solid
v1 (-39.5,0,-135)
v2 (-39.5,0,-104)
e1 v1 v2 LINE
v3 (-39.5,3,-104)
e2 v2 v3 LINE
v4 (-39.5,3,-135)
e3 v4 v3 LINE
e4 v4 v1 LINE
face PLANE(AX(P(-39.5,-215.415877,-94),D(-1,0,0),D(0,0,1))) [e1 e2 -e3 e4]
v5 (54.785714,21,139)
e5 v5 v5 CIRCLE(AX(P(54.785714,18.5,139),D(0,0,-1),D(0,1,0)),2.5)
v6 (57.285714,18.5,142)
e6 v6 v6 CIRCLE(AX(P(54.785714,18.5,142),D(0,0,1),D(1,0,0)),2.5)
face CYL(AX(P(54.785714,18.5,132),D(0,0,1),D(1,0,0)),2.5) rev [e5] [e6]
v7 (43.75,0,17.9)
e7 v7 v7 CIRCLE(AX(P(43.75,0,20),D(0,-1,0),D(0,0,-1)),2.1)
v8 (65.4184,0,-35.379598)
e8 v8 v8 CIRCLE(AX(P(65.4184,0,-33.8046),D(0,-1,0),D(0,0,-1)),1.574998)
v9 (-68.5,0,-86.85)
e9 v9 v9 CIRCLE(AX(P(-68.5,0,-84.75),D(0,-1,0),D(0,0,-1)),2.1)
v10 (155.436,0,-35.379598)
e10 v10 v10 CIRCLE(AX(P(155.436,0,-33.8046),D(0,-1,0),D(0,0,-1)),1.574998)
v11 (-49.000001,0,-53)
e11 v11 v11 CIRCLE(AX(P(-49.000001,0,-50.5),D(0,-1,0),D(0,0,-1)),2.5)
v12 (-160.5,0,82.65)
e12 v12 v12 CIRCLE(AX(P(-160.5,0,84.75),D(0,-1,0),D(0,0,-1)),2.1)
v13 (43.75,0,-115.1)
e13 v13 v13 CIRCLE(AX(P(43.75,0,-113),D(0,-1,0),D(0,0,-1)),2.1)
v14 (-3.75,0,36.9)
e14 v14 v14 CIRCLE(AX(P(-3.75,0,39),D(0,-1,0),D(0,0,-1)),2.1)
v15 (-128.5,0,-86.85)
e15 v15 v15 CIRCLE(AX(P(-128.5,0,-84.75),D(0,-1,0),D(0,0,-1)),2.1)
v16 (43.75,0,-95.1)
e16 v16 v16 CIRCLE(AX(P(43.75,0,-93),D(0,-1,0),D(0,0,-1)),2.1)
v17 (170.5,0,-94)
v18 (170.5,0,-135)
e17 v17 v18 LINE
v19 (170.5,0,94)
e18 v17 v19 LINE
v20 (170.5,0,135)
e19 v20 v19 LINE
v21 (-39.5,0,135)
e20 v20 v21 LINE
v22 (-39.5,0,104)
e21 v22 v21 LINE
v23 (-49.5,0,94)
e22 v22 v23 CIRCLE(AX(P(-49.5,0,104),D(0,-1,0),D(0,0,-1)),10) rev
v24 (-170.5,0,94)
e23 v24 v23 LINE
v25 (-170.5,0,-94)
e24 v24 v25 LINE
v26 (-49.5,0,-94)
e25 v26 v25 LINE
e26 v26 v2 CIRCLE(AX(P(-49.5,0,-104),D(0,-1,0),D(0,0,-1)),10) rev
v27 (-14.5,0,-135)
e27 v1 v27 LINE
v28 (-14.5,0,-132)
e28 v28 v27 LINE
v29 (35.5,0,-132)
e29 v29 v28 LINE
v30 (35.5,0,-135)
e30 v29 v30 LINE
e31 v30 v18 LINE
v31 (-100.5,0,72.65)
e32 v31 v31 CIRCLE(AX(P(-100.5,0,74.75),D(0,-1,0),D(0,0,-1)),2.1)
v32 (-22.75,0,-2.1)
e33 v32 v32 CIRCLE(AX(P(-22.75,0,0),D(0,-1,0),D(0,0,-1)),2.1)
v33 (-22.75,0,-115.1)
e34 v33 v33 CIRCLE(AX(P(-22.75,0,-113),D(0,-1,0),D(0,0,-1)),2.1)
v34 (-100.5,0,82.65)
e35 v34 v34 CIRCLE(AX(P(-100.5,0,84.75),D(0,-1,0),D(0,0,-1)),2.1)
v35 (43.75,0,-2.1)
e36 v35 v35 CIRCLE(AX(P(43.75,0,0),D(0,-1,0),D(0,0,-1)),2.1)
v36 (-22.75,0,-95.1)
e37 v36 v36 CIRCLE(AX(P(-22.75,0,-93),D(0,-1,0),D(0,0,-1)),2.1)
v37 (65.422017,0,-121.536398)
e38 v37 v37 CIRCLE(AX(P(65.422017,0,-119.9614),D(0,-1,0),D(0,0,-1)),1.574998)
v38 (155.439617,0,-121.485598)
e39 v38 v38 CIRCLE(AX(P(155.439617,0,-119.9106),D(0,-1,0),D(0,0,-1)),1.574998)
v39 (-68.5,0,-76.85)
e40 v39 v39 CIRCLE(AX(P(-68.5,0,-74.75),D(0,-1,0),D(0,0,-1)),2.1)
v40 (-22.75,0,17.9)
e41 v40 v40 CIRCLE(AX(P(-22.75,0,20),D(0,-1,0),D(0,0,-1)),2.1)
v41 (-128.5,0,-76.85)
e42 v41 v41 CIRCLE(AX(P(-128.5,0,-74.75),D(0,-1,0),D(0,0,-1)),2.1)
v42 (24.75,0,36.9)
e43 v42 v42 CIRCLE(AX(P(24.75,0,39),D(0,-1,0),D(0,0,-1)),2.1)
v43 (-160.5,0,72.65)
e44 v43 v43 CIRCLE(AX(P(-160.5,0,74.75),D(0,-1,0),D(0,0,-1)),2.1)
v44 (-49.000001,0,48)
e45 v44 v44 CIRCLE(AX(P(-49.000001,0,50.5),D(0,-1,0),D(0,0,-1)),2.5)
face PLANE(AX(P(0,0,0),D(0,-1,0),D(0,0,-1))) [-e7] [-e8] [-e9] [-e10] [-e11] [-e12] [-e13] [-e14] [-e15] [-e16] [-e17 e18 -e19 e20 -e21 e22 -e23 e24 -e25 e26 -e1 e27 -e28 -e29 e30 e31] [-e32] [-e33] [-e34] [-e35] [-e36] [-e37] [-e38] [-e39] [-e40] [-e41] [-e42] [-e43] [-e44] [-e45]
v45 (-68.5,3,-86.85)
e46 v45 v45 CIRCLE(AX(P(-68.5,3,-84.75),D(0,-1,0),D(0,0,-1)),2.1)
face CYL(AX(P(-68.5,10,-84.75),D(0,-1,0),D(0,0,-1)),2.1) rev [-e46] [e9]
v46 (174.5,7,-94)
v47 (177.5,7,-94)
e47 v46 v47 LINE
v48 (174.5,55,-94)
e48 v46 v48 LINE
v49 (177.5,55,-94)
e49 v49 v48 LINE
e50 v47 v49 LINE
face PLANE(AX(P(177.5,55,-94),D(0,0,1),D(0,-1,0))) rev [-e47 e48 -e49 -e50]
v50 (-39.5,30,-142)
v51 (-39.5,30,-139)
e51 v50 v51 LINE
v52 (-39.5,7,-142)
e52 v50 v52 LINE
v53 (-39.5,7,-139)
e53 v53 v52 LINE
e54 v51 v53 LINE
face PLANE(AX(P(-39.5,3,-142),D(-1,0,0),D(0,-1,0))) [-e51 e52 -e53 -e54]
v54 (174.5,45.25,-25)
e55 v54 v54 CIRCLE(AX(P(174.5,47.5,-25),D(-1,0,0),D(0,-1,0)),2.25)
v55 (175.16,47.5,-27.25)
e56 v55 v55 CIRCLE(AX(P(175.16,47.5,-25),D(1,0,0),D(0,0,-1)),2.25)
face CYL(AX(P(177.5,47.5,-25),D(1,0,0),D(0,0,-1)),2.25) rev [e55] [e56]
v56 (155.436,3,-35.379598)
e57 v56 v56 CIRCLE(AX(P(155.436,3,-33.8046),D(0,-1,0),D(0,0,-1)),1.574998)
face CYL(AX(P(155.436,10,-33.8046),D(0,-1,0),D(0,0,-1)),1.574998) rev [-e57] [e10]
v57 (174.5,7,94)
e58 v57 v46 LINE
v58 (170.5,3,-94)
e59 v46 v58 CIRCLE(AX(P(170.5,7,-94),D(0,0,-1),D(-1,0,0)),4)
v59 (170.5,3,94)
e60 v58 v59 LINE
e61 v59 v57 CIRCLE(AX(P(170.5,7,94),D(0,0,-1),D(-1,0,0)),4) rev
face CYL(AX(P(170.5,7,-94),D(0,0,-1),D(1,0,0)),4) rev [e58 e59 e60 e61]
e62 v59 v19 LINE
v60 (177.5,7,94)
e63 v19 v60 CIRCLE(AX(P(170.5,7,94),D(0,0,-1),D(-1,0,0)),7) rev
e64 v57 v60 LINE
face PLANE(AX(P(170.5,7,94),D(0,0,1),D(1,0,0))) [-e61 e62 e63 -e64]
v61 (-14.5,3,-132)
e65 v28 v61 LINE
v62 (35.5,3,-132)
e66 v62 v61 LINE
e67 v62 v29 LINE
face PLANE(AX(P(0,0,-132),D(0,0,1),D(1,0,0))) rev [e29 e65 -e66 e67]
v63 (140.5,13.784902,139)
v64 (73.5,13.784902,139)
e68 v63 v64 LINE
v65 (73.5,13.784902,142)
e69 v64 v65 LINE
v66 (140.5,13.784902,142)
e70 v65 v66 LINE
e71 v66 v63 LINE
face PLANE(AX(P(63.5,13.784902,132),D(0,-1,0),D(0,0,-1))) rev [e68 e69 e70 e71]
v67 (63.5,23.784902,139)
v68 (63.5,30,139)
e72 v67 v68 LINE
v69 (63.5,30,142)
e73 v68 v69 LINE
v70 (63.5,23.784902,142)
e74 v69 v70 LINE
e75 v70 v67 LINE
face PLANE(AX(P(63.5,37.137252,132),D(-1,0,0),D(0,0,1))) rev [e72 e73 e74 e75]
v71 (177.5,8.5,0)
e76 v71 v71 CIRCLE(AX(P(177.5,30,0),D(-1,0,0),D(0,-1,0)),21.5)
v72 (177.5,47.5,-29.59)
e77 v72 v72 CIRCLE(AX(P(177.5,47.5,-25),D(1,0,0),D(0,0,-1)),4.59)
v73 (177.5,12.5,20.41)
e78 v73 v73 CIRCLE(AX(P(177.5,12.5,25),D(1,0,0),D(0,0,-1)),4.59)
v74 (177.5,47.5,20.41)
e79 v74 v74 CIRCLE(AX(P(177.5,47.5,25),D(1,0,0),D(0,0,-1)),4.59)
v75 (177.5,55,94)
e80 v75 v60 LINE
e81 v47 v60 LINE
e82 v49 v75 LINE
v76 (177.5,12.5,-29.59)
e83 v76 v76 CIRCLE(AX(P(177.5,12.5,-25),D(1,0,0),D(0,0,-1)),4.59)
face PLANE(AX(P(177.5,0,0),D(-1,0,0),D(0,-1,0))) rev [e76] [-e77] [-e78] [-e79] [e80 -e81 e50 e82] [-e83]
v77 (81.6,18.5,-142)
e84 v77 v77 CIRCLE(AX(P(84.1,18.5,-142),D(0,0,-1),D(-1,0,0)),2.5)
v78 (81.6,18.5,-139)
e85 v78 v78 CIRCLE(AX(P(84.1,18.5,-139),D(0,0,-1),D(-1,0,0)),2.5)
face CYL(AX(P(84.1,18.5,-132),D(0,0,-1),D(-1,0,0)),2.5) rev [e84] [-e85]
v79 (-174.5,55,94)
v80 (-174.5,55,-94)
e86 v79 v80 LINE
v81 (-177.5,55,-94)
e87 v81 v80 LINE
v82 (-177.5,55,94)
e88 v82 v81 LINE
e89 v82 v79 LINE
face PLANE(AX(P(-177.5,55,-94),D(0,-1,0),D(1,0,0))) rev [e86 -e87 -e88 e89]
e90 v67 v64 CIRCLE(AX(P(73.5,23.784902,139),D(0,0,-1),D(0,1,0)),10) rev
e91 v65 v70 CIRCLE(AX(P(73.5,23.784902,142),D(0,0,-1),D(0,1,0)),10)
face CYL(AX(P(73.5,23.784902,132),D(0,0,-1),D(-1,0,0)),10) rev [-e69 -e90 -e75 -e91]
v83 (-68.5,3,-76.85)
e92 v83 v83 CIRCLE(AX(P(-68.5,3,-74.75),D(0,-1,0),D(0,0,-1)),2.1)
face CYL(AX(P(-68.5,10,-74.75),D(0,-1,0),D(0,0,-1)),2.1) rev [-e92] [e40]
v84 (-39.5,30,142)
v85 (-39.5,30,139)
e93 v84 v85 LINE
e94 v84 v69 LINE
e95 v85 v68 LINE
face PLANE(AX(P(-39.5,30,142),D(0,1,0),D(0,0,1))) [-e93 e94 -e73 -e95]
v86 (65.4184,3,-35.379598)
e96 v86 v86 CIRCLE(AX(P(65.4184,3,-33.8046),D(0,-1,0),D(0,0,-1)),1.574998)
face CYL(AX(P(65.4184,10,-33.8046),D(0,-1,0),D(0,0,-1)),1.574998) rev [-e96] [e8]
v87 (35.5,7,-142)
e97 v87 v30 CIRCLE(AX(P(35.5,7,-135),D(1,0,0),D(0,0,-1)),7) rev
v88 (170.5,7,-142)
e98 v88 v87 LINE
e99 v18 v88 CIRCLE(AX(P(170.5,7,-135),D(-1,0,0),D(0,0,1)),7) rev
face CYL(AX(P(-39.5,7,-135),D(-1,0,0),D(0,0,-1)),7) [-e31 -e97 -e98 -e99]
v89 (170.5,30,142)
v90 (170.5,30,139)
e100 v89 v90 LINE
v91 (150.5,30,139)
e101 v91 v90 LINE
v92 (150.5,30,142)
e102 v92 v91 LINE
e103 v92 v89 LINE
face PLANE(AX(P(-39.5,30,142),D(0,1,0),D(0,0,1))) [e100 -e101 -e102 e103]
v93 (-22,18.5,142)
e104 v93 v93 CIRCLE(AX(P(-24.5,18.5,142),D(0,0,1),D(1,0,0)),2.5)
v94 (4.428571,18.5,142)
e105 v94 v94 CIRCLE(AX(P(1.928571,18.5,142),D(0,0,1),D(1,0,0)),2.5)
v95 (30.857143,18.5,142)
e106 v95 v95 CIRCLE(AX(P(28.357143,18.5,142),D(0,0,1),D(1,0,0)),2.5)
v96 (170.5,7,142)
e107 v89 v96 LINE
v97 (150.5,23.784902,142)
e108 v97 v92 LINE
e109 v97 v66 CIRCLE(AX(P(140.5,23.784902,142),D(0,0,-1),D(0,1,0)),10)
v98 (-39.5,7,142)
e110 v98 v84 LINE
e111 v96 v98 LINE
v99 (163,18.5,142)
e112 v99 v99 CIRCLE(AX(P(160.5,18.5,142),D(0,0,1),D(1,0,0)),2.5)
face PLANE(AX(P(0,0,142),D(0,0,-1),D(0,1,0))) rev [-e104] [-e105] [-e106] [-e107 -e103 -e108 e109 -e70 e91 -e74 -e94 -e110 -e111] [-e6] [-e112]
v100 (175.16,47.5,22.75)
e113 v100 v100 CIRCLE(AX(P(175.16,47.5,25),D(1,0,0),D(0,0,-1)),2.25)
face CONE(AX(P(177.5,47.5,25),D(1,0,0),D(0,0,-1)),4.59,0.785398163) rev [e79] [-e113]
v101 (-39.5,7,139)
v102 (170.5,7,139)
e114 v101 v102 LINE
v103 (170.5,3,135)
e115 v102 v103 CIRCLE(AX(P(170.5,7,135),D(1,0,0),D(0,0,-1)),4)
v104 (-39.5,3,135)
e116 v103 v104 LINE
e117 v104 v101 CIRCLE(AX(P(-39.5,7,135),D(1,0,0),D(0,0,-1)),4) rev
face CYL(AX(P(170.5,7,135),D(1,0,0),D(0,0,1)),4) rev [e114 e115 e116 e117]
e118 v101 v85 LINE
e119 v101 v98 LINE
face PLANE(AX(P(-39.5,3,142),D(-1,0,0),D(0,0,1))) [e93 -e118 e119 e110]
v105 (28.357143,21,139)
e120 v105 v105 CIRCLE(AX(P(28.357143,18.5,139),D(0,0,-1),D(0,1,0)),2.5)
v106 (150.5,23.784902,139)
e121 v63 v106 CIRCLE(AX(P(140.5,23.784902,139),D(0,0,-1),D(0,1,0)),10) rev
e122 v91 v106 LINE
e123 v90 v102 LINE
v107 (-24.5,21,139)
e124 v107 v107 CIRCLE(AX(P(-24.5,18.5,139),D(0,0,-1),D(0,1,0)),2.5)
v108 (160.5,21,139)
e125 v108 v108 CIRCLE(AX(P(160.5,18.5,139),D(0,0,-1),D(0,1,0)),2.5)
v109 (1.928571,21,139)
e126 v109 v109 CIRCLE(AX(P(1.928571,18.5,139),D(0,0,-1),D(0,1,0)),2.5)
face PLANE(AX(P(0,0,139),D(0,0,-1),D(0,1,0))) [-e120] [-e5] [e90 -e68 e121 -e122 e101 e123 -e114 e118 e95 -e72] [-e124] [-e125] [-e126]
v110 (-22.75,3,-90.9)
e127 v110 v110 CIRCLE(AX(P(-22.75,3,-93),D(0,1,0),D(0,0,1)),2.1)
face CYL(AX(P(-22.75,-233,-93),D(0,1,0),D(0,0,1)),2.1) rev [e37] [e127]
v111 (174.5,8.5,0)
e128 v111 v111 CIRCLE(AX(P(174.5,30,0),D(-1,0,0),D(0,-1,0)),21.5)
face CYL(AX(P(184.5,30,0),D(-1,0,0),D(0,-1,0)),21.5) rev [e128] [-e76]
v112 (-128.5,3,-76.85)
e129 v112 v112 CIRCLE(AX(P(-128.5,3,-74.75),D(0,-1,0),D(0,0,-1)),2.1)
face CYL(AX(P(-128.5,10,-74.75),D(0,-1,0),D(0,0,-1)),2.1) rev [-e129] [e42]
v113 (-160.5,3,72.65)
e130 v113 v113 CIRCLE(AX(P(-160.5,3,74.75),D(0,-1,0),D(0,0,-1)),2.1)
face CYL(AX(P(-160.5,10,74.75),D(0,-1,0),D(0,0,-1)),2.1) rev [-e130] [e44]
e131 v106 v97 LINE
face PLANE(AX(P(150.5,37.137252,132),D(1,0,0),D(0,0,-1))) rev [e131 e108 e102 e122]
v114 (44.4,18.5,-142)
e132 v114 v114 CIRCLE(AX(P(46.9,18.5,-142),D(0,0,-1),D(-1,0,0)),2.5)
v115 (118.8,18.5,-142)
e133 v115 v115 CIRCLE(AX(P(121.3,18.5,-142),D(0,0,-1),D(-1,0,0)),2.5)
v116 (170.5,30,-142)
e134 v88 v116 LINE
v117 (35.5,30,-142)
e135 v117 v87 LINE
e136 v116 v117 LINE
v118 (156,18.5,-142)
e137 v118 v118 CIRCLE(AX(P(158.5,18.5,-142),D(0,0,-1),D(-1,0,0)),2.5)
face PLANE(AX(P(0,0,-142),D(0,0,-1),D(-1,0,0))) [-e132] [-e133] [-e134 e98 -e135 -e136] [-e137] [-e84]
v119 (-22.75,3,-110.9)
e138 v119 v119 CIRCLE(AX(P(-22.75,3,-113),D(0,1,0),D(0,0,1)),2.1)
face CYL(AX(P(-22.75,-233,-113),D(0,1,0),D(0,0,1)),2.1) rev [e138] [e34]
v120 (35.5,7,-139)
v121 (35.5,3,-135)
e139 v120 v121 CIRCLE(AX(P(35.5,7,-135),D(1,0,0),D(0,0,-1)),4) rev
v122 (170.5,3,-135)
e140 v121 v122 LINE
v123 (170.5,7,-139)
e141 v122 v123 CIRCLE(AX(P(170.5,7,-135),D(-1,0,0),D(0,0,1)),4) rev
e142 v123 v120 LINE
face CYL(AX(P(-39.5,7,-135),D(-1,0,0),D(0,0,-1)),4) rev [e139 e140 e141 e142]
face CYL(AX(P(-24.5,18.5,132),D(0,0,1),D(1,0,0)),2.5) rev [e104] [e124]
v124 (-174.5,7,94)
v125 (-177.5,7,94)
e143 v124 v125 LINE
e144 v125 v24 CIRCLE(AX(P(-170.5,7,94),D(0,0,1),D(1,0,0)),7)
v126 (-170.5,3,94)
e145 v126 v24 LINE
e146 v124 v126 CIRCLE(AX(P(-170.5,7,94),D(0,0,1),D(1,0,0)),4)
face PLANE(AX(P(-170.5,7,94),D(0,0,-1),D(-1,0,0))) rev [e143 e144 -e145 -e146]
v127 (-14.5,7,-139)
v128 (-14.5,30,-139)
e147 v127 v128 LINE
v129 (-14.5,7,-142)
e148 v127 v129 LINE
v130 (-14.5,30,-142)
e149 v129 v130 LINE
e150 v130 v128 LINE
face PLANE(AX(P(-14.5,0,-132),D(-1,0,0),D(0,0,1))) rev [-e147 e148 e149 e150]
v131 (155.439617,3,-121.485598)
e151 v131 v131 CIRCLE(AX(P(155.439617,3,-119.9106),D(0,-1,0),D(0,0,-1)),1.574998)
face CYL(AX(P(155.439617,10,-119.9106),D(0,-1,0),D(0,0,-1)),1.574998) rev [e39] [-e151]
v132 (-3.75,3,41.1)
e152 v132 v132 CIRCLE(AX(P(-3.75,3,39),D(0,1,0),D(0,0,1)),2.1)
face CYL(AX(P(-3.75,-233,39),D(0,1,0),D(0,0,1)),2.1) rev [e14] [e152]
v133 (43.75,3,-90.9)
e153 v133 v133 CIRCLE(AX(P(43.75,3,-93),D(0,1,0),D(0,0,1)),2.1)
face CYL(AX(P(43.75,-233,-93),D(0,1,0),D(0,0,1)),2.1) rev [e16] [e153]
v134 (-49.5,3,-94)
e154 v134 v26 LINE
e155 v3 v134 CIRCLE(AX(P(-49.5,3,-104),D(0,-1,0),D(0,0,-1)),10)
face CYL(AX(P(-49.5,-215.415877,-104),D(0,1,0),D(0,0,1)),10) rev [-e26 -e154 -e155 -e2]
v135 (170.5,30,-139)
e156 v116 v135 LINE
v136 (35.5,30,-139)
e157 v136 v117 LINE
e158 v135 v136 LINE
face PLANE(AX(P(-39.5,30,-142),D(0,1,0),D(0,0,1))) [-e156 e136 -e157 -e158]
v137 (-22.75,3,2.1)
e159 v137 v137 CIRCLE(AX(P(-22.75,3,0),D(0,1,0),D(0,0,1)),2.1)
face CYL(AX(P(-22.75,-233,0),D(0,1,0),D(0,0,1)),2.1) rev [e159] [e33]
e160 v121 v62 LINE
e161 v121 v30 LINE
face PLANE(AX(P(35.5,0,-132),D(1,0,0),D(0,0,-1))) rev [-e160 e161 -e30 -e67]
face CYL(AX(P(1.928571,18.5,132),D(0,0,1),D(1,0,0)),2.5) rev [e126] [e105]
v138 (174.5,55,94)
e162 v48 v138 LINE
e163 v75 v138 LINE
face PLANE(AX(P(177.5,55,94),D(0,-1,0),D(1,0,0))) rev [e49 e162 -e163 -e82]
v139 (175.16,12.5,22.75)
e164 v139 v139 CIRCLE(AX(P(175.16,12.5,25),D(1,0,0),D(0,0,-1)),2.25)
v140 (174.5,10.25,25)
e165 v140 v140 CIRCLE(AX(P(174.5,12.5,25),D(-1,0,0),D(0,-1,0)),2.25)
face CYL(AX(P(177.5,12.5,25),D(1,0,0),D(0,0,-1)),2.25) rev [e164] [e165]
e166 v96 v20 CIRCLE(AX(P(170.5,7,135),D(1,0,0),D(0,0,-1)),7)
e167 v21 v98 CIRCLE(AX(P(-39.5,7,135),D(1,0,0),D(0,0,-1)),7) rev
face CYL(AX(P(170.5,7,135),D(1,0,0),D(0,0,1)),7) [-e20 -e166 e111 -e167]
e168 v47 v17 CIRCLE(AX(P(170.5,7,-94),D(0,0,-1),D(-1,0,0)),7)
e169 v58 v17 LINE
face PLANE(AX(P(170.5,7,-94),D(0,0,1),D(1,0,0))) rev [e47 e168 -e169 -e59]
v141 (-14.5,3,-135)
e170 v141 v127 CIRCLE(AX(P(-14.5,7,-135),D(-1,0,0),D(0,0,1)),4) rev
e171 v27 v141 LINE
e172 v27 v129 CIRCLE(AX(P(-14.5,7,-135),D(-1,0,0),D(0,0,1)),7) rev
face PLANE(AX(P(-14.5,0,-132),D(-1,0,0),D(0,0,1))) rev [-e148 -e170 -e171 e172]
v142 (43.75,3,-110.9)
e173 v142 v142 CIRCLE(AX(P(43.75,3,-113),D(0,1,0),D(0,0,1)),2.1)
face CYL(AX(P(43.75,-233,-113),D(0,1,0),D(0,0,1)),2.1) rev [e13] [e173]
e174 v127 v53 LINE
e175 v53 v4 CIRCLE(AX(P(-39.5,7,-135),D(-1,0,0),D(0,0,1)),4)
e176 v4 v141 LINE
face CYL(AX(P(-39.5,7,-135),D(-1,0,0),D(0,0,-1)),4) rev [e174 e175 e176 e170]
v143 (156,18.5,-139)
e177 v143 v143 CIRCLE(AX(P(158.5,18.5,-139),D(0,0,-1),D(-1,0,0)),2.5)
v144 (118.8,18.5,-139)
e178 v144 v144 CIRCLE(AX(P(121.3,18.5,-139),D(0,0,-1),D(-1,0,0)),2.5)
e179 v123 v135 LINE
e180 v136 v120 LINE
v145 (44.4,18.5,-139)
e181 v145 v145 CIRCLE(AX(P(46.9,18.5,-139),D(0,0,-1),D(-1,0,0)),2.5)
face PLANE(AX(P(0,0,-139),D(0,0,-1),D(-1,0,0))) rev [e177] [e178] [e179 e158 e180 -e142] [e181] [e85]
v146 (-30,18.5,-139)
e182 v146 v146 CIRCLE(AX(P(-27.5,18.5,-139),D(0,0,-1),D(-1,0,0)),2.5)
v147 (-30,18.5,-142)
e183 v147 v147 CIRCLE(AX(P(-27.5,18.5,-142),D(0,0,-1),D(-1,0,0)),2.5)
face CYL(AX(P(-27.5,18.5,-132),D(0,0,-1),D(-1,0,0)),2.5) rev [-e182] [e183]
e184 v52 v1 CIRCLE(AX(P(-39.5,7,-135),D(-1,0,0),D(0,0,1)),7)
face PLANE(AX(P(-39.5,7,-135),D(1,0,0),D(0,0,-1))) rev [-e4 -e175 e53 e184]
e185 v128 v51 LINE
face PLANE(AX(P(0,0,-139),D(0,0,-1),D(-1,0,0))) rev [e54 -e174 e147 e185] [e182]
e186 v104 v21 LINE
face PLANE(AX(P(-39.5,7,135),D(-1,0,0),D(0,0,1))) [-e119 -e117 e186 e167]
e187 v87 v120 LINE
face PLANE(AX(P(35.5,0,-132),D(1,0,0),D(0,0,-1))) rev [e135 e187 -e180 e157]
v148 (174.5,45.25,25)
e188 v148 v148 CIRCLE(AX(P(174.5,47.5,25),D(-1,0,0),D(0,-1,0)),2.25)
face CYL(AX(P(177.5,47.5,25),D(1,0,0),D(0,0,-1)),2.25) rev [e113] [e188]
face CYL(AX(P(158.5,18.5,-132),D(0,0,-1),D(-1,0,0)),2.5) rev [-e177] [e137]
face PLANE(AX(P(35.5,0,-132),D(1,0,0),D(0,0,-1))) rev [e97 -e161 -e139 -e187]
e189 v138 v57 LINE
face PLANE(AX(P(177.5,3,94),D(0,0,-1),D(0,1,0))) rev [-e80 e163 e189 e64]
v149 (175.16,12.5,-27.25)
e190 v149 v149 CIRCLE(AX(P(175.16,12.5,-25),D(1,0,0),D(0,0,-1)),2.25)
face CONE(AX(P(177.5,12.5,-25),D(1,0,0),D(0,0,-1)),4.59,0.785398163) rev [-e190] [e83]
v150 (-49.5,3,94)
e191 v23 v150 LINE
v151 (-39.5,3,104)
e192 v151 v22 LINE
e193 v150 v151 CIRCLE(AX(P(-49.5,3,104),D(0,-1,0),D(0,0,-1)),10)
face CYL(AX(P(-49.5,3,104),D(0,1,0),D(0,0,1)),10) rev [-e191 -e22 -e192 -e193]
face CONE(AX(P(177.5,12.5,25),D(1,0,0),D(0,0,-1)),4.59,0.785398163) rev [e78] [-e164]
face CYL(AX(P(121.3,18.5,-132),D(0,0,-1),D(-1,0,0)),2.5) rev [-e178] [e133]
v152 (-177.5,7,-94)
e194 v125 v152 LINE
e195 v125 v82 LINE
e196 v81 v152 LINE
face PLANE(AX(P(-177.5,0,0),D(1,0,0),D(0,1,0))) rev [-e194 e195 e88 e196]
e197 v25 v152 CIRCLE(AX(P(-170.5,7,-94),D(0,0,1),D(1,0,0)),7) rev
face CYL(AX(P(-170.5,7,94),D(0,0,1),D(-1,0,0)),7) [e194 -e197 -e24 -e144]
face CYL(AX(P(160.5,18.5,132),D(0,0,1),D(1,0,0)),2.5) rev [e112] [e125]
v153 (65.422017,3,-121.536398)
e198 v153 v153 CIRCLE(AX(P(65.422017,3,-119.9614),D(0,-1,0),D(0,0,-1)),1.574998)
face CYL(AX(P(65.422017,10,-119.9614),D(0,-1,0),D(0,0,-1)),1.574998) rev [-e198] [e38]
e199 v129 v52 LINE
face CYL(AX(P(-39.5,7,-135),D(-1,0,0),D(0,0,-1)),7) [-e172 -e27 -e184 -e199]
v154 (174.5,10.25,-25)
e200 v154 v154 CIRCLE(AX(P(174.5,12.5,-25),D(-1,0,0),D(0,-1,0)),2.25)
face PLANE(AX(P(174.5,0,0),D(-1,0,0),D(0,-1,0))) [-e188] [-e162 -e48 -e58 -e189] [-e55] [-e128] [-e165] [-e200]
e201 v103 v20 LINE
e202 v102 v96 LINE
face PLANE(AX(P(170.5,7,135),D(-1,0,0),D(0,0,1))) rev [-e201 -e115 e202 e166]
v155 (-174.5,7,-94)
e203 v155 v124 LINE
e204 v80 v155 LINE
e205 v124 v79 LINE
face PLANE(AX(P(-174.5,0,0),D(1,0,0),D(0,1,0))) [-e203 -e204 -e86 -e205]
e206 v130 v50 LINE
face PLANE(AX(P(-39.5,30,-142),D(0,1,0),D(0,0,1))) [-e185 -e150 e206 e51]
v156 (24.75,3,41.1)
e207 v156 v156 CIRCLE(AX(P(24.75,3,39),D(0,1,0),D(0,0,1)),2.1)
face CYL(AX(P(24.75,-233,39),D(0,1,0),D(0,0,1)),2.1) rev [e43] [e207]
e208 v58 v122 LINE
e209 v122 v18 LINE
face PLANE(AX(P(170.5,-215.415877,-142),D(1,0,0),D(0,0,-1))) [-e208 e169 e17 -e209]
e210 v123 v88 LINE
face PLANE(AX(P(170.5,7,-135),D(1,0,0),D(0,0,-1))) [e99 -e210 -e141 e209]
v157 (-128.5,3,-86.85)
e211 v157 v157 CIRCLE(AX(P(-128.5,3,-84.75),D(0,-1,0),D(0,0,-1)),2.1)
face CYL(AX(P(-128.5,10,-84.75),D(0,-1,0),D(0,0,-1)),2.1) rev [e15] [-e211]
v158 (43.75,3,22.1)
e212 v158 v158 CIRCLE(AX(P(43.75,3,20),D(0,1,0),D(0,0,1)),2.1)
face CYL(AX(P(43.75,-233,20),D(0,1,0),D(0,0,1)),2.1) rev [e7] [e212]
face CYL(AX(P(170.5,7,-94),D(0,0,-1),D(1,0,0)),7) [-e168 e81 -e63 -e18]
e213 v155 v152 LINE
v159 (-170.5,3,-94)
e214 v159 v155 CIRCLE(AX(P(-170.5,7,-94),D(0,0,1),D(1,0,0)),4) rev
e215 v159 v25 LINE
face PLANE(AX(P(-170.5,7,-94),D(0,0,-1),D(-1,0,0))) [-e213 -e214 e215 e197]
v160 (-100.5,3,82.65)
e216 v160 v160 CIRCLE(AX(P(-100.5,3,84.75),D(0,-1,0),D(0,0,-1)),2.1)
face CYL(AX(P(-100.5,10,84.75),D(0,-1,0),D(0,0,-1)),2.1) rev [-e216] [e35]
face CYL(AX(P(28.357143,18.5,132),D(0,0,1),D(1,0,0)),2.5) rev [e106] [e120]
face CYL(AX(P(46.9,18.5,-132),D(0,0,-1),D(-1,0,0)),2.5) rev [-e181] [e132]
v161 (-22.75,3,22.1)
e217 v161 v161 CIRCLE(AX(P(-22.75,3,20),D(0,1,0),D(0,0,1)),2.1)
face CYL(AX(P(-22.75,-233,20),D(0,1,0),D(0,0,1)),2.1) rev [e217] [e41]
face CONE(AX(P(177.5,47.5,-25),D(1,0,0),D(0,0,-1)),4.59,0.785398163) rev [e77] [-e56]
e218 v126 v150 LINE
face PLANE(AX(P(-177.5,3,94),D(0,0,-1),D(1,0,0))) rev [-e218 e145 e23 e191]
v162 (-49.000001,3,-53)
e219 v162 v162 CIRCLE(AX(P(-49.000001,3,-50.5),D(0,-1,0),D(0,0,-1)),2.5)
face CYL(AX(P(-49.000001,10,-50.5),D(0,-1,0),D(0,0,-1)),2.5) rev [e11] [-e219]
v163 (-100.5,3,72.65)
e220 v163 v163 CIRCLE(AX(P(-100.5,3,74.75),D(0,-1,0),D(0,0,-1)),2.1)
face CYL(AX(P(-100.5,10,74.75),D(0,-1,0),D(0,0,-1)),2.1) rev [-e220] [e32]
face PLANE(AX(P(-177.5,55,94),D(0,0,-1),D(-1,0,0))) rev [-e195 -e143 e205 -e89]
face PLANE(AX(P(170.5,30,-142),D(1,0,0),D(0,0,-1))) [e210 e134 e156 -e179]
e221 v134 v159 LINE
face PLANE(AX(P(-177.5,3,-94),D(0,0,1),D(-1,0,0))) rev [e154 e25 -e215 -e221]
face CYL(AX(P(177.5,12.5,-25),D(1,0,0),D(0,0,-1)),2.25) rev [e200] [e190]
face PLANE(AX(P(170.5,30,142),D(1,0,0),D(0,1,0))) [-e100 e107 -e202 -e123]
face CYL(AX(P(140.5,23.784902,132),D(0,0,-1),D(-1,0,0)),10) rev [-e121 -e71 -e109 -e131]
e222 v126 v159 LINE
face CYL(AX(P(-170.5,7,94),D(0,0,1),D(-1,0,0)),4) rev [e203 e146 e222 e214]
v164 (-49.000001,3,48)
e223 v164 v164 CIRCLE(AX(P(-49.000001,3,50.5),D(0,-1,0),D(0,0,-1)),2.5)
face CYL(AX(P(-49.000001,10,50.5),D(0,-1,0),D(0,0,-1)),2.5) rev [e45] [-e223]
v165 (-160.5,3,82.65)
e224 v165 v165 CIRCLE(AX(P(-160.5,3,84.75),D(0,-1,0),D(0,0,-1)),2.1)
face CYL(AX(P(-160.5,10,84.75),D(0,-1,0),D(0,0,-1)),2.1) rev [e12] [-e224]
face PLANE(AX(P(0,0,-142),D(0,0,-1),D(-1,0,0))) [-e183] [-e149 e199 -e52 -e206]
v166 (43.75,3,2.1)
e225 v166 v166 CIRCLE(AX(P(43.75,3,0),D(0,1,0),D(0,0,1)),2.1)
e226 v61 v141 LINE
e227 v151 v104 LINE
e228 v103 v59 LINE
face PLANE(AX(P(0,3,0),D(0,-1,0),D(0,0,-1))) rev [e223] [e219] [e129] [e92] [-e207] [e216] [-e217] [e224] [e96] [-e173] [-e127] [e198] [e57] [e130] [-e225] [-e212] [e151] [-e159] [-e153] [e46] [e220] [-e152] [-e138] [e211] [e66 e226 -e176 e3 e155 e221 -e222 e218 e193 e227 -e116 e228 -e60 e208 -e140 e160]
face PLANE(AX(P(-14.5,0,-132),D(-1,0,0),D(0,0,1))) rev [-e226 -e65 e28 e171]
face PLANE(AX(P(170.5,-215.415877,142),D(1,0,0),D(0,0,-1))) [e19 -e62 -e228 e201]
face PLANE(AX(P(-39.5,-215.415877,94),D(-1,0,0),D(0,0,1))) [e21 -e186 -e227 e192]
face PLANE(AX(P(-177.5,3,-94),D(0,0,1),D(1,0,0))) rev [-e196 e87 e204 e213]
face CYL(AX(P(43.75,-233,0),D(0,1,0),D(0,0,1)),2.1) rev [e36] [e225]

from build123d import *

# Parameters (mm, degrees)
SKETCH1_W                                            = 355
SKETCH1_H                                            = 188
BOSS_EXTRUDE1_DEPTH                                  = 3
EDGE_FLANGE1_STRIP_W                                 = 20
EDGE_FLANGE1_STRIP_H                                 = 3
EDGE_FLANGE1_STRIP_CUT_DEPTH                         = 188
EDGE_FLANGE1_DEPTH                                   = 188
SKETCH11_R                                           = 21.5
CUT_EXTRUDE2_DEPTH                                   = 10
CSK_FOR_M4_HEX_SOCKET_COUNTERSUNK_HEAD_S_D           = 4.5
CSK_FOR_M4_HEX_SOCKET_COUNTERSUNK_HEAD_S_DEPTH       = 10
CSK_FOR_M4_HEX_SOCKET_COUNTERSUNK_HEAD_S_CSINK_D     = 9.18
CSK_FOR_M4_HEX_SOCKET_COUNTERSUNK_HEAD_S_CSINK_ANGLE = 90
CSK_FOR_M4_HEX_SOCKET_COUNTERSUNK_HEAD_S_TIP         = 1.351936393
EDGE_FLANGE2_STRIP_W                                 = 20
EDGE_FLANGE2_STRIP_H                                 = 3
EDGE_FLANGE2_STRIP_CUT_DEPTH                         = 188
EDGE_FLANGE2_DEPTH                                   = 188
SKETCH19_W                                           = 210
SKETCH19_H                                           = 48
BOSS_EXTRUDE2_DEPTH                                  = 3
FILLET1_R                                            = 10
EDGE_FLANGE3_STRIP_W                                 = 20
EDGE_FLANGE3_STRIP_H                                 = 3
EDGE_FLANGE3_STRIP_CUT_DEPTH                         = 210
EDGE_FLANGE3_STRIP_2_W                               = 20
EDGE_FLANGE3_STRIP_2_H                               = 3
EDGE_FLANGE3_STRIP_CUT_2_DEPTH                       = 210
EDGE_FLANGE3_DEPTH                                   = 210
EDGE_FLANGE3_BEND_DEPTH                              = 210
SKETCH26_R                                           = 2.1
CUT_EXTRUDE3_DEPTH                                   = 10
SKETCH28_W                                           = 50
SKETCH28_H                                           = 30
CUT_EXTRUDE4_DEPTH                                   = 10
SKETCH29_W                                           = 87
SKETCH29_H                                           = 23.35234987
CUT_EXTRUDE5_DEPTH                                   = 10
FILLET2_R                                            = 10
SKETCH30_R                                           = 2.5
SKETCH30_R_2                                         = 1.57499812
CUT_EXTRUDE6_DEPTH                                   = 10
SKETCH31_R                                           = 2.1
CUT_EXTRUDE7_DEPTH                                   = 236
SKETCH32_R                                           = 2.5
CUT_EXTRUDE8_DEPTH                                   = 10
SKETCH33_R                                           = 2.5
CUT_EXTRUDE9_DEPTH                                   = 10


# Sheet-metal steps are written as plain solids
with BuildPart() as part:
    # Sketch1 → Boss-Extrude1 (new body)
    with BuildSketch(Plane(origin=(0, 0, 0), x_dir=(1, 0, 0), z_dir=(0, 1, 0))):
        Rectangle(SKETCH1_W, SKETCH1_H)
    extrude(amount=BOSS_EXTRUDE1_DEPTH)

    # Edge-Flange1 strip (across the edge) → Edge-Flange1 strip cut (cut)
    with BuildSketch(Plane(origin=(177.5, 3, 94), x_dir=(-1, 0, 0), z_dir=(0, 0, -1))):
        with Locations((-3, -1.5)):
            Rectangle(EDGE_FLANGE1_STRIP_W, EDGE_FLANGE1_STRIP_H)
    extrude(amount=EDGE_FLANGE1_STRIP_CUT_DEPTH, mode=Mode.SUBTRACT)

    # Edge-Flange1 section (across the edge) → Edge-Flange1 (add)
    with BuildSketch(Plane(origin=(177.5, 3, 94), x_dir=(-1, 0, 0), z_dir=(0, 0, -1))):
        with BuildLine():
            Line((0, 4), (0, 52))
            Line((0, 52), (3, 52))
            Line((3, 52), (3, 4))
            ThreePointArc((3, 4), (4.171572875, 1.171572875), (7, 0))
            Line((7, 0), (7, -3))
            ThreePointArc((7, -3), (2.050252532, -0.949747468), (0, 4))
        make_face()
    extrude(amount=EDGE_FLANGE1_DEPTH)

    # Sketch11 → Cut-Extrude2 (cut)
    with BuildSketch(Plane.ZY.offset(-174.5)):
        with Locations(Location((0, 30, 0), (0, 0, 270))):
            Circle(SKETCH11_R)
    extrude(amount=-CUT_EXTRUDE2_DEPTH, mode=Mode.SUBTRACT)

    # CSK for M4 Hex Socket Countersunk Head Screw1
    with Locations(Plane(origin=(177.5, 0, 0), x_dir=(0, 0, -1), z_dir=(1, 0, 0))):
        with Locations((-25, 47.5), (25, 47.5), (25, 12.5), (-25, 12.5)):
            CounterSinkHole(CSK_FOR_M4_HEX_SOCKET_COUNTERSUNK_HEAD_S_D / 2, CSK_FOR_M4_HEX_SOCKET_COUNTERSUNK_HEAD_S_CSINK_D / 2, depth=CSK_FOR_M4_HEX_SOCKET_COUNTERSUNK_HEAD_S_DEPTH, counter_sink_angle=CSK_FOR_M4_HEX_SOCKET_COUNTERSUNK_HEAD_S_CSINK_ANGLE)
            with Locations((0, 0, -(CSK_FOR_M4_HEX_SOCKET_COUNTERSUNK_HEAD_S_DEPTH + CSK_FOR_M4_HEX_SOCKET_COUNTERSUNK_HEAD_S_TIP / 2))):  # 118° drill point
                Cone(0, CSK_FOR_M4_HEX_SOCKET_COUNTERSUNK_HEAD_S_D / 2, CSK_FOR_M4_HEX_SOCKET_COUNTERSUNK_HEAD_S_TIP, mode=Mode.SUBTRACT)

    # Edge-Flange2 strip (across the edge) → Edge-Flange2 strip cut (cut)
    with BuildSketch(Plane(origin=(-177.5, 3, -94), x_dir=(1, 0, 0), z_dir=(0, 0, 1))):
        with Locations((-3, -1.5)):
            Rectangle(EDGE_FLANGE2_STRIP_W, EDGE_FLANGE2_STRIP_H)
    extrude(amount=EDGE_FLANGE2_STRIP_CUT_DEPTH, mode=Mode.SUBTRACT)

    # Edge-Flange2 section (across the edge) → Edge-Flange2 (add)
    with BuildSketch(Plane(origin=(-177.5, 3, -94), x_dir=(1, 0, 0), z_dir=(0, 0, 1))):
        with BuildLine():
            Line((0, 4), (0, 52))
            Line((0, 52), (3, 52))
            Line((3, 52), (3, 4))
            ThreePointArc((3, 4), (4.171572875, 1.171572875), (7, 0))
            Line((7, 0), (7, -3))
            ThreePointArc((7, -3), (2.050252532, -0.949747468), (0, 4))
        make_face()
    extrude(amount=EDGE_FLANGE2_DEPTH)

    # Sketch19 → Boss-Extrude2 (add)
    with BuildSketch(Plane(origin=(0, 3, 0), x_dir=(1, 0, 0), z_dir=(0, 1, 0))):
        with Locations((65.5, 118)):
            Rectangle(SKETCH19_W, SKETCH19_H)
        with Locations((65.5, -118)):
            Rectangle(SKETCH19_W, SKETCH19_H)
    extrude(amount=-BOSS_EXTRUDE2_DEPTH)

    # Fillet1
    fillet1_edges = [part.edges().sort_by_distance(p)[0] for p in [
        (-39.5, 1.5, -94),
        (-39.5, 1.5, 94),
    ]]
    fillet(fillet1_edges, radius=FILLET1_R)

    # Edge-Flange3 strip (across the edge) → Edge-Flange3 strip cut (cut)
    with BuildSketch(Plane(origin=(170.5, 3, -142), x_dir=(0, 0, 1), z_dir=(-1, 0, 0))):
        with Locations((-3, -1.5)):
            Rectangle(EDGE_FLANGE3_STRIP_W, EDGE_FLANGE3_STRIP_H)
    extrude(amount=EDGE_FLANGE3_STRIP_CUT_DEPTH, mode=Mode.SUBTRACT)

    # Edge-Flange3 strip 2 (across the edge) → Edge-Flange3 strip cut 2 (cut)
    with BuildSketch(Plane(origin=(-39.5, 3, 142), x_dir=(0, 0, -1), z_dir=(1, 0, 0))):
        with Locations((-3, -1.5)):
            Rectangle(EDGE_FLANGE3_STRIP_2_W, EDGE_FLANGE3_STRIP_2_H)
    extrude(amount=EDGE_FLANGE3_STRIP_CUT_2_DEPTH, mode=Mode.SUBTRACT)

    # Edge-Flange3 section (across the edge) → Edge-Flange3 (add)
    with BuildSketch(Plane(origin=(170.5, 3, -142), x_dir=(0, 0, 1), z_dir=(-1, 0, 0))):
        with BuildLine():
            Line((0, 4), (0, 27))
            Line((0, 27), (3, 27))
            Line((3, 27), (3, 4))
            ThreePointArc((3, 4), (4.171572875, 1.171572875), (7, 0))
            Line((7, 0), (7, -3))
            ThreePointArc((7, -3), (2.050252532, -0.949747468), (0, 4))
        make_face()
    extrude(amount=EDGE_FLANGE3_DEPTH)

    # Edge-Flange3 section 2 (across the edge) → Edge-Flange3 bend (add)
    with BuildSketch(Plane(origin=(-39.5, 3, 142), x_dir=(0, 0, -1), z_dir=(1, 0, 0))):
        with BuildLine():
            Line((0, 4), (0, 27))
            Line((0, 27), (3, 27))
            Line((3, 27), (3, 4))
            ThreePointArc((3, 4), (4.171572875, 1.171572875), (7, 0))
            Line((7, 0), (7, -3))
            ThreePointArc((7, -3), (2.050252532, -0.949747468), (0, 4))
        make_face()
    extrude(amount=EDGE_FLANGE3_BEND_DEPTH)

    # Sketch26 → Cut-Extrude3 (cut)
    with BuildSketch(Plane(origin=(0, 0, 0), x_dir=(-1, 0, 0), z_dir=(0, -1, 0))):
        with Locations(Location((160.5, -74.75, 0), (0, 0, 90))):
            Circle(SKETCH26_R)
        with Locations(Location((160.5, -84.75, 0), (0, 0, 90))):
            Circle(SKETCH26_R)
        with Locations(Location((100.5, -84.75, 0), (0, 0, 90))):
            Circle(SKETCH26_R)
        with Locations(Location((100.5, -74.75, 0), (0, 0, 90))):
            Circle(SKETCH26_R)
        with Locations(Location((128.5, 74.75, 0), (0, 0, 90))):
            Circle(SKETCH26_R)
        with Locations(Location((128.5, 84.75, 0), (0, 0, 90))):
            Circle(SKETCH26_R)
        with Locations(Location((68.5, 74.75, 0), (0, 0, 90))):
            Circle(SKETCH26_R)
        with Locations(Location((68.5, 84.75, 0), (0, 0, 90))):
            Circle(SKETCH26_R)
    extrude(amount=-CUT_EXTRUDE3_DEPTH, mode=Mode.SUBTRACT)

    # Sketch28 → Cut-Extrude4 (cut)
    with BuildSketch(Plane(origin=(0, 0, -142), x_dir=(-1, 0, 0), z_dir=(0, 0, -1))):
        with Locations((-10.5, 15)):
            Rectangle(SKETCH28_W, SKETCH28_H)
    extrude(amount=-CUT_EXTRUDE4_DEPTH, mode=Mode.SUBTRACT)

    # Sketch29 → Cut-Extrude5 (cut)
    with BuildSketch(Plane.XY.offset(142)):
        with Locations((107, 25.461076577)):
            Rectangle(SKETCH29_W, SKETCH29_H)
    extrude(amount=-CUT_EXTRUDE5_DEPTH, mode=Mode.SUBTRACT)

    # Fillet2
    fillet2_edges = [part.edges().sort_by_distance(p)[0] for p in [
        (63.5, 13.784901642, 140.5),
        (150.5, 13.784901642, 140.5),
    ]]
    fillet(fillet2_edges, radius=FILLET2_R)

    # Sketch30 → Cut-Extrude6 (cut)
    with BuildSketch(Plane(origin=(0, 0, 0), x_dir=(-1, 0, 0), z_dir=(0, -1, 0))):
        with Locations(Location((49.000000561, -50.5, 0), (0, 0, 90))):
            Circle(SKETCH30_R)
        with Locations(Location((49.000000561, 50.5, 0), (0, 0, 90))):
            Circle(SKETCH30_R)
        with Locations(Location((-65.4184, 33.8046, 0), (0, 0, 90))):
            Circle(SKETCH30_R_2)
        with Locations(Location((-155.436, 33.8046, 0), (0, 0, 90))):
            Circle(SKETCH30_R_2)
        with Locations(Location((-155.43961696, 119.9106, 0), (0, 0, 90))):
            Circle(SKETCH30_R_2)
        with Locations(Location((-65.42201696, 119.9614, 0), (0, 0, 90))):
            Circle(SKETCH30_R_2)
    extrude(amount=-CUT_EXTRUDE6_DEPTH, mode=Mode.SUBTRACT)

    # Sketch31 → Cut-Extrude7 (cut)
    with BuildSketch(Plane(origin=(0, 3, 0), x_dir=(1, 0, 0), z_dir=(0, 1, 0))):
        with Locations(Location((-22.75, 113, 0), (0, 0, 270))):
            Circle(SKETCH31_R)
        with Locations(Location((-22.75, 93, 0), (0, 0, 270))):
            Circle(SKETCH31_R)
        with Locations(Location((43.75, 113, 0), (0, 0, 270))):
            Circle(SKETCH31_R)
        with Locations(Location((43.75, 93, 0), (0, 0, 270))):
            Circle(SKETCH31_R)
        with Locations(Location((43.75, 0, 0), (0, 0, 270))):
            Circle(SKETCH31_R)
        with Locations(Location((43.75, -20, 0), (0, 0, 270))):
            Circle(SKETCH31_R)
        with Locations(Location((-3.75, -39, 0), (0, 0, 270))):
            Circle(SKETCH31_R)
        with Locations(Location((24.75, -39, 0), (0, 0, 270))):
            Circle(SKETCH31_R)
        with Locations(Location((-22.75, 0, 0), (0, 0, 270))):
            Circle(SKETCH31_R)
        with Locations(Location((-22.75, -20, 0), (0, 0, 270))):
            Circle(SKETCH31_R)
    extrude(amount=-CUT_EXTRUDE7_DEPTH, mode=Mode.SUBTRACT)

    # Sketch32 → Cut-Extrude8 (cut)
    with BuildSketch(Plane.XY.offset(142)):
        with Locations((-24.5, 18.5)):
            Circle(SKETCH32_R)
        with Locations((1.928571429, 18.5)):
            Circle(SKETCH32_R)
        with Locations((28.357142857, 18.5)):
            Circle(SKETCH32_R)
        with Locations((54.785714286, 18.5)):
            Circle(SKETCH32_R)
        with Locations((160.5, 18.5)):
            Circle(SKETCH32_R)
    extrude(amount=-CUT_EXTRUDE8_DEPTH, mode=Mode.SUBTRACT)

    # Sketch33 → Cut-Extrude9 (cut)
    with BuildSketch(Plane(origin=(0, 0, -142), x_dir=(-1, 0, 0), z_dir=(0, 0, -1))):
        with Locations((-158.5, 18.5)):
            Circle(SKETCH33_R)
        with Locations((-121.3, 18.5)):
            Circle(SKETCH33_R)
        with Locations((-84.1, 18.5)):
            Circle(SKETCH33_R)
        with Locations((-46.9, 18.5)):
            Circle(SKETCH33_R)
        with Locations((27.5, 18.5)):
            Circle(SKETCH33_R)
    extrude(amount=-CUT_EXTRUDE9_DEPTH, mode=Mode.SUBTRACT)


solid = part.part
